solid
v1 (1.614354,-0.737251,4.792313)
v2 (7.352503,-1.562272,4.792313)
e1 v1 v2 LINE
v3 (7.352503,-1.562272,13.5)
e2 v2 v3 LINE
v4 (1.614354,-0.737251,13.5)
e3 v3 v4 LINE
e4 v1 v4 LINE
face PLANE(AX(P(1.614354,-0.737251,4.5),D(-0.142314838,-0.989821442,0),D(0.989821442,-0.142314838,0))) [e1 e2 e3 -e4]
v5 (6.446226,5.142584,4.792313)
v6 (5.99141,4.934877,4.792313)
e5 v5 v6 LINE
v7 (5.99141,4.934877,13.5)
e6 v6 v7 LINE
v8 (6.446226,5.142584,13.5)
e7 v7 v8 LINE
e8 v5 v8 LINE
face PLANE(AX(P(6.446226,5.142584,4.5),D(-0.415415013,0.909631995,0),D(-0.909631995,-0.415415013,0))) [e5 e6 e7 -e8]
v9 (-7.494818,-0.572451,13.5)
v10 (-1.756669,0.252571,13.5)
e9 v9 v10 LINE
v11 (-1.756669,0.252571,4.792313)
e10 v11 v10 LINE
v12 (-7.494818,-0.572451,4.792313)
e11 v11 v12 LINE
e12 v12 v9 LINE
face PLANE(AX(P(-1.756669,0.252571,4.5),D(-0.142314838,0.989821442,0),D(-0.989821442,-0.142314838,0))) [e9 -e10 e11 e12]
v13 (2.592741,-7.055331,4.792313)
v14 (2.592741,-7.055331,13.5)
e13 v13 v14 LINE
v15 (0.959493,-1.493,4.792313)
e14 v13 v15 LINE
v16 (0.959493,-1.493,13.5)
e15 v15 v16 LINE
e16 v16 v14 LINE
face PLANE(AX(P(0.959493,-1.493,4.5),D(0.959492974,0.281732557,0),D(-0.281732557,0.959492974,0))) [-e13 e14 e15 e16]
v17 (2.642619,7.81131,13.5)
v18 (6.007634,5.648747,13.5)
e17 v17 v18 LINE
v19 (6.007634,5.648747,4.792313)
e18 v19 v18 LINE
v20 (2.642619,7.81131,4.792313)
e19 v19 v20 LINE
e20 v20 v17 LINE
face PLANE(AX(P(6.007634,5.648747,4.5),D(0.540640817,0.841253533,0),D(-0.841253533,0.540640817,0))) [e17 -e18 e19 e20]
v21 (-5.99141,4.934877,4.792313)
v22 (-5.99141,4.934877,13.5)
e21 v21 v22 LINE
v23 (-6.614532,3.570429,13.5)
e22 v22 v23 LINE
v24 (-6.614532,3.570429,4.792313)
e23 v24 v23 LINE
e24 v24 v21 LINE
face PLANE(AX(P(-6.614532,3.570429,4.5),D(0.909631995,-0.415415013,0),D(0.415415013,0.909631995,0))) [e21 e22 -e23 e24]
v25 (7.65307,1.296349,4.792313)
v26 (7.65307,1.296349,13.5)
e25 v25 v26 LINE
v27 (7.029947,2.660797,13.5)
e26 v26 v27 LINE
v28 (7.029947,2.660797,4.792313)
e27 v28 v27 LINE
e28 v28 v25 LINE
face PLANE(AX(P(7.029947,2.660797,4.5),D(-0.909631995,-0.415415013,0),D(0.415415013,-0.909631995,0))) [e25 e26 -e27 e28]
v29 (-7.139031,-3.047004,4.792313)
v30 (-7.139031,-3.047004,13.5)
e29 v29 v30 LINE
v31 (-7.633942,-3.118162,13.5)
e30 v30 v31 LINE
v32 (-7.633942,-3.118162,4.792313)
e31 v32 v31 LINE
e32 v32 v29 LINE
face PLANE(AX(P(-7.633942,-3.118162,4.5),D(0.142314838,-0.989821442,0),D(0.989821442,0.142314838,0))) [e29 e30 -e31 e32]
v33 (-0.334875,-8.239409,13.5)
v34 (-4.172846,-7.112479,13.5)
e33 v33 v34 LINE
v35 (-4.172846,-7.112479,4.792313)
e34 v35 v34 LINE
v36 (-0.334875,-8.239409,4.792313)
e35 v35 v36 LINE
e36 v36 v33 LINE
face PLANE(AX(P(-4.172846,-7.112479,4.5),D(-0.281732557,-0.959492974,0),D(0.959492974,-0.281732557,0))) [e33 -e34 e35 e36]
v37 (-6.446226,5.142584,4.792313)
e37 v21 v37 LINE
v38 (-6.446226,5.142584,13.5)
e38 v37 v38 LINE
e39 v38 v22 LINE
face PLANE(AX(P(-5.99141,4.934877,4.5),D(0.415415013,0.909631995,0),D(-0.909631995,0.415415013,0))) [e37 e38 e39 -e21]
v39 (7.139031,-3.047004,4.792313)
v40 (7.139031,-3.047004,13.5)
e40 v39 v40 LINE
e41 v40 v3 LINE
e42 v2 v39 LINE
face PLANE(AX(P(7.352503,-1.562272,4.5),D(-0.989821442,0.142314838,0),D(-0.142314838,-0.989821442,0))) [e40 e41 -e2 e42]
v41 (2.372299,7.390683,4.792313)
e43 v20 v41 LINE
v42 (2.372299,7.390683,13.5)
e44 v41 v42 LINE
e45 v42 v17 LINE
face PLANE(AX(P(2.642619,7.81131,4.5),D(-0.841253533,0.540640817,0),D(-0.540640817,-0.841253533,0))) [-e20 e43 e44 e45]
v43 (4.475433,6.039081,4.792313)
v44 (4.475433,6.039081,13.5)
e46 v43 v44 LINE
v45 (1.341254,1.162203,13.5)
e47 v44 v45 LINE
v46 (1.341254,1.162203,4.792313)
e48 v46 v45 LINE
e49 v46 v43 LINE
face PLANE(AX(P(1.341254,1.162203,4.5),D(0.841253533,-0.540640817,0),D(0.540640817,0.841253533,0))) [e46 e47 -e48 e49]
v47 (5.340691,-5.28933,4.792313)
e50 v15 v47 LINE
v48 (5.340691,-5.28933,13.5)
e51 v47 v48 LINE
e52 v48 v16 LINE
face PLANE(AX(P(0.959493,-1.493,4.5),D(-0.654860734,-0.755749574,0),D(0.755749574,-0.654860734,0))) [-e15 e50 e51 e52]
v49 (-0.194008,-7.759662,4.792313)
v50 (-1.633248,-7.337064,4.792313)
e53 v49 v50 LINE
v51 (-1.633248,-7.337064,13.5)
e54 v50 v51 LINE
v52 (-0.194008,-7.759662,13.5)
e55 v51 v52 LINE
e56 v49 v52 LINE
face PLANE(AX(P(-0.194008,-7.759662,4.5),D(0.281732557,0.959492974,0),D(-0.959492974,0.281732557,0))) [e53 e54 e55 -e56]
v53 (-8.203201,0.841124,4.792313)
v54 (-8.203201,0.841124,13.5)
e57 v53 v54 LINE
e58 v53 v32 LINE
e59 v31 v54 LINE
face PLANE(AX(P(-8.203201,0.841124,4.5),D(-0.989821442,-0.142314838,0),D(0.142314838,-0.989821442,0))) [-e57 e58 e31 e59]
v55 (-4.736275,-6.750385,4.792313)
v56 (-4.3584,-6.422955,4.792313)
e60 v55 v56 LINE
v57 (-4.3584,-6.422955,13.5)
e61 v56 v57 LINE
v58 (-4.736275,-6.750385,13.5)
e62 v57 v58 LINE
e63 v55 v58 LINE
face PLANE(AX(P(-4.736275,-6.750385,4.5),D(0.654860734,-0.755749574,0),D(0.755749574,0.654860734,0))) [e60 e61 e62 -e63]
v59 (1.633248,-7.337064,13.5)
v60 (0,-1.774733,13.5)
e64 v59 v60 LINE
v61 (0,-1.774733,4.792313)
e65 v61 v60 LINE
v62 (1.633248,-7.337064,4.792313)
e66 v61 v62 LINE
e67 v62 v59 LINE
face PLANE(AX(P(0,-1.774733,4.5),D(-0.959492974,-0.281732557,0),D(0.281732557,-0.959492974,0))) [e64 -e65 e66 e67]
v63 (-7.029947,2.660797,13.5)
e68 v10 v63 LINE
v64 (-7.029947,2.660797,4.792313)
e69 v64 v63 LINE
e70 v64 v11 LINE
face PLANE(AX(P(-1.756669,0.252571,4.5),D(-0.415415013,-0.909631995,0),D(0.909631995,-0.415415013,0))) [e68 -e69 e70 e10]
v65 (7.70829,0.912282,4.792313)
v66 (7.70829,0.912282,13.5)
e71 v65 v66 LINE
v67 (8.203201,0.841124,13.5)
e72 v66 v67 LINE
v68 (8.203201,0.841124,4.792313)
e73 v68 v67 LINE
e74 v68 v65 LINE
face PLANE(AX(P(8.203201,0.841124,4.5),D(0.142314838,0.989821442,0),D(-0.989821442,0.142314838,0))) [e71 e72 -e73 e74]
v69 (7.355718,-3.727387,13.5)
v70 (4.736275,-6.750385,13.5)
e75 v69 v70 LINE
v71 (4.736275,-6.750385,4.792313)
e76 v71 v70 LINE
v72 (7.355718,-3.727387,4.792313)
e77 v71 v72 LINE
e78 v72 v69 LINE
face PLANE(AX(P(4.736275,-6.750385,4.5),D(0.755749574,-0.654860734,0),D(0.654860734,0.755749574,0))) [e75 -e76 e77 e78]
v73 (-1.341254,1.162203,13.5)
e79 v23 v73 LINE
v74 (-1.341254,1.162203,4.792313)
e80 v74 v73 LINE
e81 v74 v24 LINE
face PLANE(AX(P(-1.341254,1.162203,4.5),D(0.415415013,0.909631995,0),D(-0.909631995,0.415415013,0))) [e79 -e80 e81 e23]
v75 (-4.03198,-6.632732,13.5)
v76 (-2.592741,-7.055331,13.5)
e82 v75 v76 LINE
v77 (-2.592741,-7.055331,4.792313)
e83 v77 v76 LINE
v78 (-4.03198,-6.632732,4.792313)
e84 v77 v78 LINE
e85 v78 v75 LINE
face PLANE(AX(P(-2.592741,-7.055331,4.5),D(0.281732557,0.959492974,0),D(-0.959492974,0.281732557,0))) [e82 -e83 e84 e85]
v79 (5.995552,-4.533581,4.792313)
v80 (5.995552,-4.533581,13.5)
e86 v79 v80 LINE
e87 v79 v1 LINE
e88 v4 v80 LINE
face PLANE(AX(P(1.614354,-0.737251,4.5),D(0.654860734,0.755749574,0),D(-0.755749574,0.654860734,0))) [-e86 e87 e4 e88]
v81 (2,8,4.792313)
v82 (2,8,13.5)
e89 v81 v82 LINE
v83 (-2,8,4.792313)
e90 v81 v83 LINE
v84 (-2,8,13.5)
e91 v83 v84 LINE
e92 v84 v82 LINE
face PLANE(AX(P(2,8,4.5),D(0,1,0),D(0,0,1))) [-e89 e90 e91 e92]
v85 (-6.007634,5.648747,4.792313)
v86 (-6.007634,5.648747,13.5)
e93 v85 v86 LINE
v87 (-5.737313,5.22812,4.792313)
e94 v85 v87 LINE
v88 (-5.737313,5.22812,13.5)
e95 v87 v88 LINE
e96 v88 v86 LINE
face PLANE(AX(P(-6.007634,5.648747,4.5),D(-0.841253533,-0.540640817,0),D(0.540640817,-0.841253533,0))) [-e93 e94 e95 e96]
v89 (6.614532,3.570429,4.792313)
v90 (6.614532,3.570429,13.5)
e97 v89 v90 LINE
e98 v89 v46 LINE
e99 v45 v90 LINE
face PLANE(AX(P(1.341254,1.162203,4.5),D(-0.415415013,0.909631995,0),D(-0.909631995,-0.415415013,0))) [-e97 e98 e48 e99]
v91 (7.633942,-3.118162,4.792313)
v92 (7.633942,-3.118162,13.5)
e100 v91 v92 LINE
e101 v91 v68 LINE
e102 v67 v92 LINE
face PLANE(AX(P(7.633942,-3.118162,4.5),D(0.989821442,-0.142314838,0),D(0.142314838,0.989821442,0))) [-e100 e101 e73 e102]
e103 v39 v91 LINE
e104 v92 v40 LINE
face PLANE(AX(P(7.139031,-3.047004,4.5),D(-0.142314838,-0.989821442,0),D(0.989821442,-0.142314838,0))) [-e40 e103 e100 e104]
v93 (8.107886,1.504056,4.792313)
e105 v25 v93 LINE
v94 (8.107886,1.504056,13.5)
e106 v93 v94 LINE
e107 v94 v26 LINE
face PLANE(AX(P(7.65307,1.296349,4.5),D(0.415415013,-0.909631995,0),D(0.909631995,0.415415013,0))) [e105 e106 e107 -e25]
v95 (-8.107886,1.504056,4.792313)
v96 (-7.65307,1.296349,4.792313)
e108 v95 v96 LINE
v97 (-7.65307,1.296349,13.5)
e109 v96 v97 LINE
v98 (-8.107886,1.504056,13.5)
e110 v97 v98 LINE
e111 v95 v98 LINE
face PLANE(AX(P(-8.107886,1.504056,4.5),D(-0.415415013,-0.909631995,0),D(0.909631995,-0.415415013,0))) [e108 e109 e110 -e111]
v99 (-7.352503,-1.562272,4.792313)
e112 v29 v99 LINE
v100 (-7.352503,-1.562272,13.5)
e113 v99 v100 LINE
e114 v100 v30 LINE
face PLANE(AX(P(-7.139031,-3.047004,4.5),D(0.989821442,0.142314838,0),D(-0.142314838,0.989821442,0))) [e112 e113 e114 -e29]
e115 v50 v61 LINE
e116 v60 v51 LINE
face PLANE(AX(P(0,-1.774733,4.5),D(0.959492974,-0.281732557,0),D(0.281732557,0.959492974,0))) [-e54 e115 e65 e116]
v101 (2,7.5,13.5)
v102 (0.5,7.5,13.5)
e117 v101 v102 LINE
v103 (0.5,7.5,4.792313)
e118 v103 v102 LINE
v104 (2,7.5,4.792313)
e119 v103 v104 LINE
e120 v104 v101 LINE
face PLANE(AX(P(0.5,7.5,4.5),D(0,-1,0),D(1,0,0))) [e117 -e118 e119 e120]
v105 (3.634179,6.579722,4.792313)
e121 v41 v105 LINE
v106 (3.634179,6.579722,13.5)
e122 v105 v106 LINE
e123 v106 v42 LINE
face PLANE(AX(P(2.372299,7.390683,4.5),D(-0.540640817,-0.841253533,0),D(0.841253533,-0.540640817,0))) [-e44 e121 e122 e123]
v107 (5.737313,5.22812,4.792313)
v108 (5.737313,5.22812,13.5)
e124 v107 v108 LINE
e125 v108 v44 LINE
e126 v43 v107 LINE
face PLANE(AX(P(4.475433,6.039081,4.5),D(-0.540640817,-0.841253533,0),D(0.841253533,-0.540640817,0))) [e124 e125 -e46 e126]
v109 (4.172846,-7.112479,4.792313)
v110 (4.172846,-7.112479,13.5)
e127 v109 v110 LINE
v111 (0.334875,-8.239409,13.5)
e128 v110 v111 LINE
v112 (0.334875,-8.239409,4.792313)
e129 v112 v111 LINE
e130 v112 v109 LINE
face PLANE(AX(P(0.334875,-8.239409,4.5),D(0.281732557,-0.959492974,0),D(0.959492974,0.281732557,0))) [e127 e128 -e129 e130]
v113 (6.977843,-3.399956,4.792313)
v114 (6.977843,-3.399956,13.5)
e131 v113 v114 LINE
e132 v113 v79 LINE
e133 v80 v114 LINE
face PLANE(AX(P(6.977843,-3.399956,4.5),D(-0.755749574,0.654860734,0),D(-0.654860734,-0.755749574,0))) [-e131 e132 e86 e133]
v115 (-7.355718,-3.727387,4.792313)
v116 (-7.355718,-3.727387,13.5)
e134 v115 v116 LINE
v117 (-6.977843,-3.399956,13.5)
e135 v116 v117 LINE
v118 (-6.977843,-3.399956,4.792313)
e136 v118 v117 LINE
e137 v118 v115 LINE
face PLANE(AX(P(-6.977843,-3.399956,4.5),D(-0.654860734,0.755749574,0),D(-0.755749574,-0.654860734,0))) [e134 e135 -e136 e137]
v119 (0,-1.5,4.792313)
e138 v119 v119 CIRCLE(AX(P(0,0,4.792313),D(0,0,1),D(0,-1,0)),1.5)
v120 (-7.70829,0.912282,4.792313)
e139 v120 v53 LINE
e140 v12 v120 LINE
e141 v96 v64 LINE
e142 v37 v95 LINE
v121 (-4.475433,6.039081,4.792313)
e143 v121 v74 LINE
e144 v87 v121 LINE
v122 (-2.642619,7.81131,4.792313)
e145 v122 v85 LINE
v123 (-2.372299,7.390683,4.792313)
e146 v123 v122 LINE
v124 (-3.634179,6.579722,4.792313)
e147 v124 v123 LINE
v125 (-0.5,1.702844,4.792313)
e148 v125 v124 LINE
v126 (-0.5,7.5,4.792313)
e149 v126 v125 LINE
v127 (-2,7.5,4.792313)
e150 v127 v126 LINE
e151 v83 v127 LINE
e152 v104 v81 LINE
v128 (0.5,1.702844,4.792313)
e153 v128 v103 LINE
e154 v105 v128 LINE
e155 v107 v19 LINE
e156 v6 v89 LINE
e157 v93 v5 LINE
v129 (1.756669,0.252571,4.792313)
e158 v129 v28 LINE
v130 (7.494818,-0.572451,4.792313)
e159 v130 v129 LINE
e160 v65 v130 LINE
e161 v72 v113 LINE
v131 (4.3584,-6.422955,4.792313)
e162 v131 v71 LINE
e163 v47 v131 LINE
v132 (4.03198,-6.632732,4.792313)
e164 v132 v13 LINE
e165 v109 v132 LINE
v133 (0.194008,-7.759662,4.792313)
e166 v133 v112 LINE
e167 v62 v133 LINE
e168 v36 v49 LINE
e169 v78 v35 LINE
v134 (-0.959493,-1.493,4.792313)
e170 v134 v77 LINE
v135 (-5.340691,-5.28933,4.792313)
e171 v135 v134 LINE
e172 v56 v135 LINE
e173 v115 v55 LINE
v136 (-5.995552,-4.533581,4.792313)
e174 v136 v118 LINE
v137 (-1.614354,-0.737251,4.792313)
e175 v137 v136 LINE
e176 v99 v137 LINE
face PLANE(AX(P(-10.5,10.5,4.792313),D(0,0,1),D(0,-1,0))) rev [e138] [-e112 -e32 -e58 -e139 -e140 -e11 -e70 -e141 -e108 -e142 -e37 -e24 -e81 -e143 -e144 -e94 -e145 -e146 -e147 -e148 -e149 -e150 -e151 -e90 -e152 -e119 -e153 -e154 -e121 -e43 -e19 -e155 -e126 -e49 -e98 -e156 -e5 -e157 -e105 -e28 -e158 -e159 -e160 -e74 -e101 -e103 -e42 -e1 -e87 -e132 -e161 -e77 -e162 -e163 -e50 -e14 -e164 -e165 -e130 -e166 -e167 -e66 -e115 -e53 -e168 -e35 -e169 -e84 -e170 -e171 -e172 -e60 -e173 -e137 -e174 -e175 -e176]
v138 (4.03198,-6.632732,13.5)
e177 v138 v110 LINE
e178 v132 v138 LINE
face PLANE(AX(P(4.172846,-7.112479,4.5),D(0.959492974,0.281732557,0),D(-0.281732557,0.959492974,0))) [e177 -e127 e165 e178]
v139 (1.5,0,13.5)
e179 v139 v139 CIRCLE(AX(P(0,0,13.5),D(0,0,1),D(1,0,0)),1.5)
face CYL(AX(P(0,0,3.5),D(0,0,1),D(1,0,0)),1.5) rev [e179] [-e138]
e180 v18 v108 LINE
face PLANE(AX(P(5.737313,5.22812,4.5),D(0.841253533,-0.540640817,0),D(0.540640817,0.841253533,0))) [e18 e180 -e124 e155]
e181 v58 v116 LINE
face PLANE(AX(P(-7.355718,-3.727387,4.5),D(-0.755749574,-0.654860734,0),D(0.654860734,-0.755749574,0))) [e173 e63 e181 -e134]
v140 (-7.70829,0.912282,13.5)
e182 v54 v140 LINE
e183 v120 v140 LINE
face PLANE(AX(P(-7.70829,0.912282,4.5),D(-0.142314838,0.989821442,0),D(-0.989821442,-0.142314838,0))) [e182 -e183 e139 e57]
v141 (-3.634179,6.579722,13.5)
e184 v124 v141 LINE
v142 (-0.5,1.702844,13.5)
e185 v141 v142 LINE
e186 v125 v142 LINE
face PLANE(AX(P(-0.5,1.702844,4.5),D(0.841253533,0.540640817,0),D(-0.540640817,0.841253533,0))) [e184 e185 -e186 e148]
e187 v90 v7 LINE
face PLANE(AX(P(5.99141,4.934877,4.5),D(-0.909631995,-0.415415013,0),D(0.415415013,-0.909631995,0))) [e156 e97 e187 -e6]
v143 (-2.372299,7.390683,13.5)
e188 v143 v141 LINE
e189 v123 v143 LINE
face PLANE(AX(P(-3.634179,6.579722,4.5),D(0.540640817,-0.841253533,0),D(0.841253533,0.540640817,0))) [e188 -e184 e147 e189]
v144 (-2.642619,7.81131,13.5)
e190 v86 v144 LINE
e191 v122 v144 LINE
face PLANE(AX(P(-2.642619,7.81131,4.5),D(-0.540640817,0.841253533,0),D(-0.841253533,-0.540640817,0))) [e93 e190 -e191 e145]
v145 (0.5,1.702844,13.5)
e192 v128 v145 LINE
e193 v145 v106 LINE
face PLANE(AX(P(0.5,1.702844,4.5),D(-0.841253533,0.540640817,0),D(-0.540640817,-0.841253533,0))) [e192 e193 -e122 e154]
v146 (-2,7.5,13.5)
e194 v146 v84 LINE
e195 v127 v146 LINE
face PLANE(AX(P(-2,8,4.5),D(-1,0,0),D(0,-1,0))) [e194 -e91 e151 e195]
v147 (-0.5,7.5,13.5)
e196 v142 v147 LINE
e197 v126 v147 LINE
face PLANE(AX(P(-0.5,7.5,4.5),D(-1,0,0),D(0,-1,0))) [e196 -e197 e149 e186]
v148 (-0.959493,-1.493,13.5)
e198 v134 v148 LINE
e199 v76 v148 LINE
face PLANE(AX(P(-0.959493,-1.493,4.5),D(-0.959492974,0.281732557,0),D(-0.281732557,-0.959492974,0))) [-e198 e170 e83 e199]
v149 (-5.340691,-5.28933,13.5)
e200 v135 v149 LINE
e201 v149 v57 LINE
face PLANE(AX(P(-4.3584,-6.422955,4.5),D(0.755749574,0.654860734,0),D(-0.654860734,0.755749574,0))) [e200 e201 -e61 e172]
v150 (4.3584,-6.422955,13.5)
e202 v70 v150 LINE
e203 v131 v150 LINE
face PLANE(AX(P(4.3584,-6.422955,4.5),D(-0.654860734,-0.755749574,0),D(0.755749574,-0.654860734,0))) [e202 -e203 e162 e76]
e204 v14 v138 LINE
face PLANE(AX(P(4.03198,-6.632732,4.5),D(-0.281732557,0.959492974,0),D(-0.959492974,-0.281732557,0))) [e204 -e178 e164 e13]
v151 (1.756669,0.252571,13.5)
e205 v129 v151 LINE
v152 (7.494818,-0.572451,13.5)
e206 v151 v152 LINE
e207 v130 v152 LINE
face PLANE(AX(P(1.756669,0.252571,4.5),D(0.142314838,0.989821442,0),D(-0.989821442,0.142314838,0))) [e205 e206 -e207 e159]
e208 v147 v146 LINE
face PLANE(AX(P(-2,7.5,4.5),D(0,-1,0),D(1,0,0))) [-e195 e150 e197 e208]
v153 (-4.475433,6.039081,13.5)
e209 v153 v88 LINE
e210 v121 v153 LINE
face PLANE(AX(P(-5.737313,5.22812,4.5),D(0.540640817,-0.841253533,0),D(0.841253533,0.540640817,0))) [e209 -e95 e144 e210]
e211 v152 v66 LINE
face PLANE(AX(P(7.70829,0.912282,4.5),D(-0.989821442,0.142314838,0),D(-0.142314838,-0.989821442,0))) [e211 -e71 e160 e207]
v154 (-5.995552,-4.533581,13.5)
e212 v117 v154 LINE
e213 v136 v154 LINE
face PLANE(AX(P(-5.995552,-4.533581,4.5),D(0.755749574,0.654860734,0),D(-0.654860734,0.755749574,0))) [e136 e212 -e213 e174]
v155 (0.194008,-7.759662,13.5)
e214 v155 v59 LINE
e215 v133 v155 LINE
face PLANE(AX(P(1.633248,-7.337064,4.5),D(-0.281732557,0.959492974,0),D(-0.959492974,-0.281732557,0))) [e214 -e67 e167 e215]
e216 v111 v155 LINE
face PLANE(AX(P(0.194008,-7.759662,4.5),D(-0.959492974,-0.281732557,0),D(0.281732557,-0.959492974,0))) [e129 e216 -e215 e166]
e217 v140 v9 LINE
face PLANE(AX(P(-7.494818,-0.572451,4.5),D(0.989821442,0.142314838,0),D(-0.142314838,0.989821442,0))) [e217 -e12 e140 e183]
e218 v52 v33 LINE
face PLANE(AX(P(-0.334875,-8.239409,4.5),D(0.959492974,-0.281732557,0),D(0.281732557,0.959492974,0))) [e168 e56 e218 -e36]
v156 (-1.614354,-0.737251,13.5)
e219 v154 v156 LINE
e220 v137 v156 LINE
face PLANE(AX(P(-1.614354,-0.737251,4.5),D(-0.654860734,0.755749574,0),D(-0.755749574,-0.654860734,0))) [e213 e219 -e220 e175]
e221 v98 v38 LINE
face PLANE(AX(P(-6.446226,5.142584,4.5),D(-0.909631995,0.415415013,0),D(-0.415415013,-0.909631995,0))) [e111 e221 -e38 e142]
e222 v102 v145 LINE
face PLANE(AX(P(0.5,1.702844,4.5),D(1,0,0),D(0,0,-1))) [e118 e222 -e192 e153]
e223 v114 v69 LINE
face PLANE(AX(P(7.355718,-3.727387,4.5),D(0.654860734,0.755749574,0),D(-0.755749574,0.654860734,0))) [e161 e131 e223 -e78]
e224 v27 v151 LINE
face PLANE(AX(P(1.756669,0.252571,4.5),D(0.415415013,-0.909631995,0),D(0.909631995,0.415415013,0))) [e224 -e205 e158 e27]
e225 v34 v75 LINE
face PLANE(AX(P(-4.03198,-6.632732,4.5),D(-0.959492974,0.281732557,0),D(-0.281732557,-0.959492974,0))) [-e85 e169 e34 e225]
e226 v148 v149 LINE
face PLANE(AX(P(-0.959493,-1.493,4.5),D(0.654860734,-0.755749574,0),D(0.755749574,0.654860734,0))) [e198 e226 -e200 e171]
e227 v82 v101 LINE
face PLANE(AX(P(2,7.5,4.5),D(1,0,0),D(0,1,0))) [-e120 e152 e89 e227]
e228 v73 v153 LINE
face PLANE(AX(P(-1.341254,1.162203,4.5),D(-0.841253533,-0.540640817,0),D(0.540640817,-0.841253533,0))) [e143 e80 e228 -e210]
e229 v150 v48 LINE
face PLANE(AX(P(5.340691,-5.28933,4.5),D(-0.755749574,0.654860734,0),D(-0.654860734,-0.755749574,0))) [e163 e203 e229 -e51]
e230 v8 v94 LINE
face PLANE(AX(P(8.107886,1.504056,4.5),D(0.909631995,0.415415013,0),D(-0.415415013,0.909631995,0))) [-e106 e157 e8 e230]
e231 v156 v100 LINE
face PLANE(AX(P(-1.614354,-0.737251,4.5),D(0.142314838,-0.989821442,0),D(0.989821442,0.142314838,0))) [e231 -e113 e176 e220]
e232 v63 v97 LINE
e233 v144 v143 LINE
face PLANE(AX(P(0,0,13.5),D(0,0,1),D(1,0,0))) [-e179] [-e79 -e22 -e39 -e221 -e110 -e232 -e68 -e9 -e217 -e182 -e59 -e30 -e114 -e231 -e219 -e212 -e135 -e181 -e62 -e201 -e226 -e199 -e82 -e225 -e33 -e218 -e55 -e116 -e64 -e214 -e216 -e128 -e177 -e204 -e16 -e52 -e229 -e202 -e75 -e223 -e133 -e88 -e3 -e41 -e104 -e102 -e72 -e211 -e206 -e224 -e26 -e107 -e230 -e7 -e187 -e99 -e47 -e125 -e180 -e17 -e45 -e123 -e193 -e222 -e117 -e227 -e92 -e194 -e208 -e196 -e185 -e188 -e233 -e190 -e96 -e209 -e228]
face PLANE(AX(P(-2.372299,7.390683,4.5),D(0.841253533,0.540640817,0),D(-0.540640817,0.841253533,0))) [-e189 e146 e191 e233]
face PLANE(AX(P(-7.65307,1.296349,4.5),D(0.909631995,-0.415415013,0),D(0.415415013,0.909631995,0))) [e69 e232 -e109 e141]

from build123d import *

# Parameters (mm, degrees)
STOK_DYS_START             = 4.792312704
STOK_DYS_BE1806_13_1_DEPTH = 8.707687296
IZIM1_R                    = 1.5
KES_EKSTR_ZYON1_DEPTH      = 10


# Read off the part's stored shape, not the designer's step: Stok-DYS BE1806-13-1
with BuildPart() as part:
    # Stok-DYS BE1806-13-1 outline → Stok-DYS BE1806-13-1 (new body)
    with BuildSketch(Plane.XY.offset(STOK_DYS_START)):
        Polygon((2, 7.5), (2, 8), (-2, 8), (-2, 7.5), (-0.5, 7.5), (-0.5, 1.702843619), (-3.634179365, 6.579721905), (-2.372299065, 7.390683131), (-2.642619474, 7.811309898), (-6.007633605, 5.648746628), (-5.737313197, 5.228119861), (-4.475432897, 6.039081088), (-1.341253533, 1.162202802), (-6.614532459, 3.570428595), (-5.991409939, 4.934876588), (-6.446225937, 5.142584095), (-8.107885989, 1.504056113), (-7.653069991, 1.296348607), (-7.029947472, 2.6607966), (-1.756668546, 0.252570807), (-7.494818233, -0.572450566), (-7.708290491, 0.912281597), (-8.203201212, 0.841124178), (-7.633941859, -3.11816159), (-7.139031138, -3.047004171), (-7.352503395, -1.562272008), (-1.614353708, -0.737250635), (-5.995552175, -4.533580717), (-6.977843276, -3.399956356), (-7.355718063, -3.727386723), (-4.736275127, -6.75038502), (-4.35840034, -6.422954653), (-5.340691441, -5.289330292), (-0.959492974, -1.49300021), (-2.592740663, -7.055331024), (-4.031980124, -6.632732188), (-4.172846402, -7.112478675), (-0.334874508, -8.239408903), (-0.194008229, -7.759662416), (-1.63324769, -7.337063581), (0, -1.774732766), (1.63324769, -7.337063581), (0.194008229, -7.759662416), (0.334874508, -8.239408903), (4.172846402, -7.112478675), (4.031980124, -6.632732188), (2.592740663, -7.055331024), (0.959492974, -1.49300021), (5.340691441, -5.289330292), (4.35840034, -6.422954653), (4.736275127, -6.75038502), (7.355718063, -3.727386723), (6.977843276, -3.399956356), (5.995552175, -4.533580717), (1.614353708, -0.737250635), (7.352503395, -1.562272008), (7.139031138, -3.047004171), (7.633941859, -3.11816159), (8.203201212, 0.841124178), (7.708290491, 0.912281597), (7.494818233, -0.572450566), (1.756668546, 0.252570807), (7.029947472, 2.6607966), (7.653069991, 1.296348607), (8.107885989, 1.504056113), (6.446225937, 5.142584095), (5.991409939, 4.934876588), (6.614532459, 3.570428595), (1.341253533, 1.162202802), (4.475432897, 6.039081088), (5.737313197, 5.228119861), (6.007633605, 5.648746628), (2.642619474, 7.811309898), (2.372299065, 7.390683131), (3.634179364, 6.579721905), (0.5, 1.702843619), (0.5, 7.5), align=None)
    extrude(amount=STOK_DYS_BE1806_13_1_DEPTH)

    # Çizim1 → Kes-Ekstrüzyon1 (cut)
    with BuildSketch(Plane.XY.offset(13.5)):
        Circle(IZIM1_R)
    extrude(amount=-KES_EKSTR_ZYON1_DEPTH, mode=Mode.SUBTRACT)


solid = part.part
